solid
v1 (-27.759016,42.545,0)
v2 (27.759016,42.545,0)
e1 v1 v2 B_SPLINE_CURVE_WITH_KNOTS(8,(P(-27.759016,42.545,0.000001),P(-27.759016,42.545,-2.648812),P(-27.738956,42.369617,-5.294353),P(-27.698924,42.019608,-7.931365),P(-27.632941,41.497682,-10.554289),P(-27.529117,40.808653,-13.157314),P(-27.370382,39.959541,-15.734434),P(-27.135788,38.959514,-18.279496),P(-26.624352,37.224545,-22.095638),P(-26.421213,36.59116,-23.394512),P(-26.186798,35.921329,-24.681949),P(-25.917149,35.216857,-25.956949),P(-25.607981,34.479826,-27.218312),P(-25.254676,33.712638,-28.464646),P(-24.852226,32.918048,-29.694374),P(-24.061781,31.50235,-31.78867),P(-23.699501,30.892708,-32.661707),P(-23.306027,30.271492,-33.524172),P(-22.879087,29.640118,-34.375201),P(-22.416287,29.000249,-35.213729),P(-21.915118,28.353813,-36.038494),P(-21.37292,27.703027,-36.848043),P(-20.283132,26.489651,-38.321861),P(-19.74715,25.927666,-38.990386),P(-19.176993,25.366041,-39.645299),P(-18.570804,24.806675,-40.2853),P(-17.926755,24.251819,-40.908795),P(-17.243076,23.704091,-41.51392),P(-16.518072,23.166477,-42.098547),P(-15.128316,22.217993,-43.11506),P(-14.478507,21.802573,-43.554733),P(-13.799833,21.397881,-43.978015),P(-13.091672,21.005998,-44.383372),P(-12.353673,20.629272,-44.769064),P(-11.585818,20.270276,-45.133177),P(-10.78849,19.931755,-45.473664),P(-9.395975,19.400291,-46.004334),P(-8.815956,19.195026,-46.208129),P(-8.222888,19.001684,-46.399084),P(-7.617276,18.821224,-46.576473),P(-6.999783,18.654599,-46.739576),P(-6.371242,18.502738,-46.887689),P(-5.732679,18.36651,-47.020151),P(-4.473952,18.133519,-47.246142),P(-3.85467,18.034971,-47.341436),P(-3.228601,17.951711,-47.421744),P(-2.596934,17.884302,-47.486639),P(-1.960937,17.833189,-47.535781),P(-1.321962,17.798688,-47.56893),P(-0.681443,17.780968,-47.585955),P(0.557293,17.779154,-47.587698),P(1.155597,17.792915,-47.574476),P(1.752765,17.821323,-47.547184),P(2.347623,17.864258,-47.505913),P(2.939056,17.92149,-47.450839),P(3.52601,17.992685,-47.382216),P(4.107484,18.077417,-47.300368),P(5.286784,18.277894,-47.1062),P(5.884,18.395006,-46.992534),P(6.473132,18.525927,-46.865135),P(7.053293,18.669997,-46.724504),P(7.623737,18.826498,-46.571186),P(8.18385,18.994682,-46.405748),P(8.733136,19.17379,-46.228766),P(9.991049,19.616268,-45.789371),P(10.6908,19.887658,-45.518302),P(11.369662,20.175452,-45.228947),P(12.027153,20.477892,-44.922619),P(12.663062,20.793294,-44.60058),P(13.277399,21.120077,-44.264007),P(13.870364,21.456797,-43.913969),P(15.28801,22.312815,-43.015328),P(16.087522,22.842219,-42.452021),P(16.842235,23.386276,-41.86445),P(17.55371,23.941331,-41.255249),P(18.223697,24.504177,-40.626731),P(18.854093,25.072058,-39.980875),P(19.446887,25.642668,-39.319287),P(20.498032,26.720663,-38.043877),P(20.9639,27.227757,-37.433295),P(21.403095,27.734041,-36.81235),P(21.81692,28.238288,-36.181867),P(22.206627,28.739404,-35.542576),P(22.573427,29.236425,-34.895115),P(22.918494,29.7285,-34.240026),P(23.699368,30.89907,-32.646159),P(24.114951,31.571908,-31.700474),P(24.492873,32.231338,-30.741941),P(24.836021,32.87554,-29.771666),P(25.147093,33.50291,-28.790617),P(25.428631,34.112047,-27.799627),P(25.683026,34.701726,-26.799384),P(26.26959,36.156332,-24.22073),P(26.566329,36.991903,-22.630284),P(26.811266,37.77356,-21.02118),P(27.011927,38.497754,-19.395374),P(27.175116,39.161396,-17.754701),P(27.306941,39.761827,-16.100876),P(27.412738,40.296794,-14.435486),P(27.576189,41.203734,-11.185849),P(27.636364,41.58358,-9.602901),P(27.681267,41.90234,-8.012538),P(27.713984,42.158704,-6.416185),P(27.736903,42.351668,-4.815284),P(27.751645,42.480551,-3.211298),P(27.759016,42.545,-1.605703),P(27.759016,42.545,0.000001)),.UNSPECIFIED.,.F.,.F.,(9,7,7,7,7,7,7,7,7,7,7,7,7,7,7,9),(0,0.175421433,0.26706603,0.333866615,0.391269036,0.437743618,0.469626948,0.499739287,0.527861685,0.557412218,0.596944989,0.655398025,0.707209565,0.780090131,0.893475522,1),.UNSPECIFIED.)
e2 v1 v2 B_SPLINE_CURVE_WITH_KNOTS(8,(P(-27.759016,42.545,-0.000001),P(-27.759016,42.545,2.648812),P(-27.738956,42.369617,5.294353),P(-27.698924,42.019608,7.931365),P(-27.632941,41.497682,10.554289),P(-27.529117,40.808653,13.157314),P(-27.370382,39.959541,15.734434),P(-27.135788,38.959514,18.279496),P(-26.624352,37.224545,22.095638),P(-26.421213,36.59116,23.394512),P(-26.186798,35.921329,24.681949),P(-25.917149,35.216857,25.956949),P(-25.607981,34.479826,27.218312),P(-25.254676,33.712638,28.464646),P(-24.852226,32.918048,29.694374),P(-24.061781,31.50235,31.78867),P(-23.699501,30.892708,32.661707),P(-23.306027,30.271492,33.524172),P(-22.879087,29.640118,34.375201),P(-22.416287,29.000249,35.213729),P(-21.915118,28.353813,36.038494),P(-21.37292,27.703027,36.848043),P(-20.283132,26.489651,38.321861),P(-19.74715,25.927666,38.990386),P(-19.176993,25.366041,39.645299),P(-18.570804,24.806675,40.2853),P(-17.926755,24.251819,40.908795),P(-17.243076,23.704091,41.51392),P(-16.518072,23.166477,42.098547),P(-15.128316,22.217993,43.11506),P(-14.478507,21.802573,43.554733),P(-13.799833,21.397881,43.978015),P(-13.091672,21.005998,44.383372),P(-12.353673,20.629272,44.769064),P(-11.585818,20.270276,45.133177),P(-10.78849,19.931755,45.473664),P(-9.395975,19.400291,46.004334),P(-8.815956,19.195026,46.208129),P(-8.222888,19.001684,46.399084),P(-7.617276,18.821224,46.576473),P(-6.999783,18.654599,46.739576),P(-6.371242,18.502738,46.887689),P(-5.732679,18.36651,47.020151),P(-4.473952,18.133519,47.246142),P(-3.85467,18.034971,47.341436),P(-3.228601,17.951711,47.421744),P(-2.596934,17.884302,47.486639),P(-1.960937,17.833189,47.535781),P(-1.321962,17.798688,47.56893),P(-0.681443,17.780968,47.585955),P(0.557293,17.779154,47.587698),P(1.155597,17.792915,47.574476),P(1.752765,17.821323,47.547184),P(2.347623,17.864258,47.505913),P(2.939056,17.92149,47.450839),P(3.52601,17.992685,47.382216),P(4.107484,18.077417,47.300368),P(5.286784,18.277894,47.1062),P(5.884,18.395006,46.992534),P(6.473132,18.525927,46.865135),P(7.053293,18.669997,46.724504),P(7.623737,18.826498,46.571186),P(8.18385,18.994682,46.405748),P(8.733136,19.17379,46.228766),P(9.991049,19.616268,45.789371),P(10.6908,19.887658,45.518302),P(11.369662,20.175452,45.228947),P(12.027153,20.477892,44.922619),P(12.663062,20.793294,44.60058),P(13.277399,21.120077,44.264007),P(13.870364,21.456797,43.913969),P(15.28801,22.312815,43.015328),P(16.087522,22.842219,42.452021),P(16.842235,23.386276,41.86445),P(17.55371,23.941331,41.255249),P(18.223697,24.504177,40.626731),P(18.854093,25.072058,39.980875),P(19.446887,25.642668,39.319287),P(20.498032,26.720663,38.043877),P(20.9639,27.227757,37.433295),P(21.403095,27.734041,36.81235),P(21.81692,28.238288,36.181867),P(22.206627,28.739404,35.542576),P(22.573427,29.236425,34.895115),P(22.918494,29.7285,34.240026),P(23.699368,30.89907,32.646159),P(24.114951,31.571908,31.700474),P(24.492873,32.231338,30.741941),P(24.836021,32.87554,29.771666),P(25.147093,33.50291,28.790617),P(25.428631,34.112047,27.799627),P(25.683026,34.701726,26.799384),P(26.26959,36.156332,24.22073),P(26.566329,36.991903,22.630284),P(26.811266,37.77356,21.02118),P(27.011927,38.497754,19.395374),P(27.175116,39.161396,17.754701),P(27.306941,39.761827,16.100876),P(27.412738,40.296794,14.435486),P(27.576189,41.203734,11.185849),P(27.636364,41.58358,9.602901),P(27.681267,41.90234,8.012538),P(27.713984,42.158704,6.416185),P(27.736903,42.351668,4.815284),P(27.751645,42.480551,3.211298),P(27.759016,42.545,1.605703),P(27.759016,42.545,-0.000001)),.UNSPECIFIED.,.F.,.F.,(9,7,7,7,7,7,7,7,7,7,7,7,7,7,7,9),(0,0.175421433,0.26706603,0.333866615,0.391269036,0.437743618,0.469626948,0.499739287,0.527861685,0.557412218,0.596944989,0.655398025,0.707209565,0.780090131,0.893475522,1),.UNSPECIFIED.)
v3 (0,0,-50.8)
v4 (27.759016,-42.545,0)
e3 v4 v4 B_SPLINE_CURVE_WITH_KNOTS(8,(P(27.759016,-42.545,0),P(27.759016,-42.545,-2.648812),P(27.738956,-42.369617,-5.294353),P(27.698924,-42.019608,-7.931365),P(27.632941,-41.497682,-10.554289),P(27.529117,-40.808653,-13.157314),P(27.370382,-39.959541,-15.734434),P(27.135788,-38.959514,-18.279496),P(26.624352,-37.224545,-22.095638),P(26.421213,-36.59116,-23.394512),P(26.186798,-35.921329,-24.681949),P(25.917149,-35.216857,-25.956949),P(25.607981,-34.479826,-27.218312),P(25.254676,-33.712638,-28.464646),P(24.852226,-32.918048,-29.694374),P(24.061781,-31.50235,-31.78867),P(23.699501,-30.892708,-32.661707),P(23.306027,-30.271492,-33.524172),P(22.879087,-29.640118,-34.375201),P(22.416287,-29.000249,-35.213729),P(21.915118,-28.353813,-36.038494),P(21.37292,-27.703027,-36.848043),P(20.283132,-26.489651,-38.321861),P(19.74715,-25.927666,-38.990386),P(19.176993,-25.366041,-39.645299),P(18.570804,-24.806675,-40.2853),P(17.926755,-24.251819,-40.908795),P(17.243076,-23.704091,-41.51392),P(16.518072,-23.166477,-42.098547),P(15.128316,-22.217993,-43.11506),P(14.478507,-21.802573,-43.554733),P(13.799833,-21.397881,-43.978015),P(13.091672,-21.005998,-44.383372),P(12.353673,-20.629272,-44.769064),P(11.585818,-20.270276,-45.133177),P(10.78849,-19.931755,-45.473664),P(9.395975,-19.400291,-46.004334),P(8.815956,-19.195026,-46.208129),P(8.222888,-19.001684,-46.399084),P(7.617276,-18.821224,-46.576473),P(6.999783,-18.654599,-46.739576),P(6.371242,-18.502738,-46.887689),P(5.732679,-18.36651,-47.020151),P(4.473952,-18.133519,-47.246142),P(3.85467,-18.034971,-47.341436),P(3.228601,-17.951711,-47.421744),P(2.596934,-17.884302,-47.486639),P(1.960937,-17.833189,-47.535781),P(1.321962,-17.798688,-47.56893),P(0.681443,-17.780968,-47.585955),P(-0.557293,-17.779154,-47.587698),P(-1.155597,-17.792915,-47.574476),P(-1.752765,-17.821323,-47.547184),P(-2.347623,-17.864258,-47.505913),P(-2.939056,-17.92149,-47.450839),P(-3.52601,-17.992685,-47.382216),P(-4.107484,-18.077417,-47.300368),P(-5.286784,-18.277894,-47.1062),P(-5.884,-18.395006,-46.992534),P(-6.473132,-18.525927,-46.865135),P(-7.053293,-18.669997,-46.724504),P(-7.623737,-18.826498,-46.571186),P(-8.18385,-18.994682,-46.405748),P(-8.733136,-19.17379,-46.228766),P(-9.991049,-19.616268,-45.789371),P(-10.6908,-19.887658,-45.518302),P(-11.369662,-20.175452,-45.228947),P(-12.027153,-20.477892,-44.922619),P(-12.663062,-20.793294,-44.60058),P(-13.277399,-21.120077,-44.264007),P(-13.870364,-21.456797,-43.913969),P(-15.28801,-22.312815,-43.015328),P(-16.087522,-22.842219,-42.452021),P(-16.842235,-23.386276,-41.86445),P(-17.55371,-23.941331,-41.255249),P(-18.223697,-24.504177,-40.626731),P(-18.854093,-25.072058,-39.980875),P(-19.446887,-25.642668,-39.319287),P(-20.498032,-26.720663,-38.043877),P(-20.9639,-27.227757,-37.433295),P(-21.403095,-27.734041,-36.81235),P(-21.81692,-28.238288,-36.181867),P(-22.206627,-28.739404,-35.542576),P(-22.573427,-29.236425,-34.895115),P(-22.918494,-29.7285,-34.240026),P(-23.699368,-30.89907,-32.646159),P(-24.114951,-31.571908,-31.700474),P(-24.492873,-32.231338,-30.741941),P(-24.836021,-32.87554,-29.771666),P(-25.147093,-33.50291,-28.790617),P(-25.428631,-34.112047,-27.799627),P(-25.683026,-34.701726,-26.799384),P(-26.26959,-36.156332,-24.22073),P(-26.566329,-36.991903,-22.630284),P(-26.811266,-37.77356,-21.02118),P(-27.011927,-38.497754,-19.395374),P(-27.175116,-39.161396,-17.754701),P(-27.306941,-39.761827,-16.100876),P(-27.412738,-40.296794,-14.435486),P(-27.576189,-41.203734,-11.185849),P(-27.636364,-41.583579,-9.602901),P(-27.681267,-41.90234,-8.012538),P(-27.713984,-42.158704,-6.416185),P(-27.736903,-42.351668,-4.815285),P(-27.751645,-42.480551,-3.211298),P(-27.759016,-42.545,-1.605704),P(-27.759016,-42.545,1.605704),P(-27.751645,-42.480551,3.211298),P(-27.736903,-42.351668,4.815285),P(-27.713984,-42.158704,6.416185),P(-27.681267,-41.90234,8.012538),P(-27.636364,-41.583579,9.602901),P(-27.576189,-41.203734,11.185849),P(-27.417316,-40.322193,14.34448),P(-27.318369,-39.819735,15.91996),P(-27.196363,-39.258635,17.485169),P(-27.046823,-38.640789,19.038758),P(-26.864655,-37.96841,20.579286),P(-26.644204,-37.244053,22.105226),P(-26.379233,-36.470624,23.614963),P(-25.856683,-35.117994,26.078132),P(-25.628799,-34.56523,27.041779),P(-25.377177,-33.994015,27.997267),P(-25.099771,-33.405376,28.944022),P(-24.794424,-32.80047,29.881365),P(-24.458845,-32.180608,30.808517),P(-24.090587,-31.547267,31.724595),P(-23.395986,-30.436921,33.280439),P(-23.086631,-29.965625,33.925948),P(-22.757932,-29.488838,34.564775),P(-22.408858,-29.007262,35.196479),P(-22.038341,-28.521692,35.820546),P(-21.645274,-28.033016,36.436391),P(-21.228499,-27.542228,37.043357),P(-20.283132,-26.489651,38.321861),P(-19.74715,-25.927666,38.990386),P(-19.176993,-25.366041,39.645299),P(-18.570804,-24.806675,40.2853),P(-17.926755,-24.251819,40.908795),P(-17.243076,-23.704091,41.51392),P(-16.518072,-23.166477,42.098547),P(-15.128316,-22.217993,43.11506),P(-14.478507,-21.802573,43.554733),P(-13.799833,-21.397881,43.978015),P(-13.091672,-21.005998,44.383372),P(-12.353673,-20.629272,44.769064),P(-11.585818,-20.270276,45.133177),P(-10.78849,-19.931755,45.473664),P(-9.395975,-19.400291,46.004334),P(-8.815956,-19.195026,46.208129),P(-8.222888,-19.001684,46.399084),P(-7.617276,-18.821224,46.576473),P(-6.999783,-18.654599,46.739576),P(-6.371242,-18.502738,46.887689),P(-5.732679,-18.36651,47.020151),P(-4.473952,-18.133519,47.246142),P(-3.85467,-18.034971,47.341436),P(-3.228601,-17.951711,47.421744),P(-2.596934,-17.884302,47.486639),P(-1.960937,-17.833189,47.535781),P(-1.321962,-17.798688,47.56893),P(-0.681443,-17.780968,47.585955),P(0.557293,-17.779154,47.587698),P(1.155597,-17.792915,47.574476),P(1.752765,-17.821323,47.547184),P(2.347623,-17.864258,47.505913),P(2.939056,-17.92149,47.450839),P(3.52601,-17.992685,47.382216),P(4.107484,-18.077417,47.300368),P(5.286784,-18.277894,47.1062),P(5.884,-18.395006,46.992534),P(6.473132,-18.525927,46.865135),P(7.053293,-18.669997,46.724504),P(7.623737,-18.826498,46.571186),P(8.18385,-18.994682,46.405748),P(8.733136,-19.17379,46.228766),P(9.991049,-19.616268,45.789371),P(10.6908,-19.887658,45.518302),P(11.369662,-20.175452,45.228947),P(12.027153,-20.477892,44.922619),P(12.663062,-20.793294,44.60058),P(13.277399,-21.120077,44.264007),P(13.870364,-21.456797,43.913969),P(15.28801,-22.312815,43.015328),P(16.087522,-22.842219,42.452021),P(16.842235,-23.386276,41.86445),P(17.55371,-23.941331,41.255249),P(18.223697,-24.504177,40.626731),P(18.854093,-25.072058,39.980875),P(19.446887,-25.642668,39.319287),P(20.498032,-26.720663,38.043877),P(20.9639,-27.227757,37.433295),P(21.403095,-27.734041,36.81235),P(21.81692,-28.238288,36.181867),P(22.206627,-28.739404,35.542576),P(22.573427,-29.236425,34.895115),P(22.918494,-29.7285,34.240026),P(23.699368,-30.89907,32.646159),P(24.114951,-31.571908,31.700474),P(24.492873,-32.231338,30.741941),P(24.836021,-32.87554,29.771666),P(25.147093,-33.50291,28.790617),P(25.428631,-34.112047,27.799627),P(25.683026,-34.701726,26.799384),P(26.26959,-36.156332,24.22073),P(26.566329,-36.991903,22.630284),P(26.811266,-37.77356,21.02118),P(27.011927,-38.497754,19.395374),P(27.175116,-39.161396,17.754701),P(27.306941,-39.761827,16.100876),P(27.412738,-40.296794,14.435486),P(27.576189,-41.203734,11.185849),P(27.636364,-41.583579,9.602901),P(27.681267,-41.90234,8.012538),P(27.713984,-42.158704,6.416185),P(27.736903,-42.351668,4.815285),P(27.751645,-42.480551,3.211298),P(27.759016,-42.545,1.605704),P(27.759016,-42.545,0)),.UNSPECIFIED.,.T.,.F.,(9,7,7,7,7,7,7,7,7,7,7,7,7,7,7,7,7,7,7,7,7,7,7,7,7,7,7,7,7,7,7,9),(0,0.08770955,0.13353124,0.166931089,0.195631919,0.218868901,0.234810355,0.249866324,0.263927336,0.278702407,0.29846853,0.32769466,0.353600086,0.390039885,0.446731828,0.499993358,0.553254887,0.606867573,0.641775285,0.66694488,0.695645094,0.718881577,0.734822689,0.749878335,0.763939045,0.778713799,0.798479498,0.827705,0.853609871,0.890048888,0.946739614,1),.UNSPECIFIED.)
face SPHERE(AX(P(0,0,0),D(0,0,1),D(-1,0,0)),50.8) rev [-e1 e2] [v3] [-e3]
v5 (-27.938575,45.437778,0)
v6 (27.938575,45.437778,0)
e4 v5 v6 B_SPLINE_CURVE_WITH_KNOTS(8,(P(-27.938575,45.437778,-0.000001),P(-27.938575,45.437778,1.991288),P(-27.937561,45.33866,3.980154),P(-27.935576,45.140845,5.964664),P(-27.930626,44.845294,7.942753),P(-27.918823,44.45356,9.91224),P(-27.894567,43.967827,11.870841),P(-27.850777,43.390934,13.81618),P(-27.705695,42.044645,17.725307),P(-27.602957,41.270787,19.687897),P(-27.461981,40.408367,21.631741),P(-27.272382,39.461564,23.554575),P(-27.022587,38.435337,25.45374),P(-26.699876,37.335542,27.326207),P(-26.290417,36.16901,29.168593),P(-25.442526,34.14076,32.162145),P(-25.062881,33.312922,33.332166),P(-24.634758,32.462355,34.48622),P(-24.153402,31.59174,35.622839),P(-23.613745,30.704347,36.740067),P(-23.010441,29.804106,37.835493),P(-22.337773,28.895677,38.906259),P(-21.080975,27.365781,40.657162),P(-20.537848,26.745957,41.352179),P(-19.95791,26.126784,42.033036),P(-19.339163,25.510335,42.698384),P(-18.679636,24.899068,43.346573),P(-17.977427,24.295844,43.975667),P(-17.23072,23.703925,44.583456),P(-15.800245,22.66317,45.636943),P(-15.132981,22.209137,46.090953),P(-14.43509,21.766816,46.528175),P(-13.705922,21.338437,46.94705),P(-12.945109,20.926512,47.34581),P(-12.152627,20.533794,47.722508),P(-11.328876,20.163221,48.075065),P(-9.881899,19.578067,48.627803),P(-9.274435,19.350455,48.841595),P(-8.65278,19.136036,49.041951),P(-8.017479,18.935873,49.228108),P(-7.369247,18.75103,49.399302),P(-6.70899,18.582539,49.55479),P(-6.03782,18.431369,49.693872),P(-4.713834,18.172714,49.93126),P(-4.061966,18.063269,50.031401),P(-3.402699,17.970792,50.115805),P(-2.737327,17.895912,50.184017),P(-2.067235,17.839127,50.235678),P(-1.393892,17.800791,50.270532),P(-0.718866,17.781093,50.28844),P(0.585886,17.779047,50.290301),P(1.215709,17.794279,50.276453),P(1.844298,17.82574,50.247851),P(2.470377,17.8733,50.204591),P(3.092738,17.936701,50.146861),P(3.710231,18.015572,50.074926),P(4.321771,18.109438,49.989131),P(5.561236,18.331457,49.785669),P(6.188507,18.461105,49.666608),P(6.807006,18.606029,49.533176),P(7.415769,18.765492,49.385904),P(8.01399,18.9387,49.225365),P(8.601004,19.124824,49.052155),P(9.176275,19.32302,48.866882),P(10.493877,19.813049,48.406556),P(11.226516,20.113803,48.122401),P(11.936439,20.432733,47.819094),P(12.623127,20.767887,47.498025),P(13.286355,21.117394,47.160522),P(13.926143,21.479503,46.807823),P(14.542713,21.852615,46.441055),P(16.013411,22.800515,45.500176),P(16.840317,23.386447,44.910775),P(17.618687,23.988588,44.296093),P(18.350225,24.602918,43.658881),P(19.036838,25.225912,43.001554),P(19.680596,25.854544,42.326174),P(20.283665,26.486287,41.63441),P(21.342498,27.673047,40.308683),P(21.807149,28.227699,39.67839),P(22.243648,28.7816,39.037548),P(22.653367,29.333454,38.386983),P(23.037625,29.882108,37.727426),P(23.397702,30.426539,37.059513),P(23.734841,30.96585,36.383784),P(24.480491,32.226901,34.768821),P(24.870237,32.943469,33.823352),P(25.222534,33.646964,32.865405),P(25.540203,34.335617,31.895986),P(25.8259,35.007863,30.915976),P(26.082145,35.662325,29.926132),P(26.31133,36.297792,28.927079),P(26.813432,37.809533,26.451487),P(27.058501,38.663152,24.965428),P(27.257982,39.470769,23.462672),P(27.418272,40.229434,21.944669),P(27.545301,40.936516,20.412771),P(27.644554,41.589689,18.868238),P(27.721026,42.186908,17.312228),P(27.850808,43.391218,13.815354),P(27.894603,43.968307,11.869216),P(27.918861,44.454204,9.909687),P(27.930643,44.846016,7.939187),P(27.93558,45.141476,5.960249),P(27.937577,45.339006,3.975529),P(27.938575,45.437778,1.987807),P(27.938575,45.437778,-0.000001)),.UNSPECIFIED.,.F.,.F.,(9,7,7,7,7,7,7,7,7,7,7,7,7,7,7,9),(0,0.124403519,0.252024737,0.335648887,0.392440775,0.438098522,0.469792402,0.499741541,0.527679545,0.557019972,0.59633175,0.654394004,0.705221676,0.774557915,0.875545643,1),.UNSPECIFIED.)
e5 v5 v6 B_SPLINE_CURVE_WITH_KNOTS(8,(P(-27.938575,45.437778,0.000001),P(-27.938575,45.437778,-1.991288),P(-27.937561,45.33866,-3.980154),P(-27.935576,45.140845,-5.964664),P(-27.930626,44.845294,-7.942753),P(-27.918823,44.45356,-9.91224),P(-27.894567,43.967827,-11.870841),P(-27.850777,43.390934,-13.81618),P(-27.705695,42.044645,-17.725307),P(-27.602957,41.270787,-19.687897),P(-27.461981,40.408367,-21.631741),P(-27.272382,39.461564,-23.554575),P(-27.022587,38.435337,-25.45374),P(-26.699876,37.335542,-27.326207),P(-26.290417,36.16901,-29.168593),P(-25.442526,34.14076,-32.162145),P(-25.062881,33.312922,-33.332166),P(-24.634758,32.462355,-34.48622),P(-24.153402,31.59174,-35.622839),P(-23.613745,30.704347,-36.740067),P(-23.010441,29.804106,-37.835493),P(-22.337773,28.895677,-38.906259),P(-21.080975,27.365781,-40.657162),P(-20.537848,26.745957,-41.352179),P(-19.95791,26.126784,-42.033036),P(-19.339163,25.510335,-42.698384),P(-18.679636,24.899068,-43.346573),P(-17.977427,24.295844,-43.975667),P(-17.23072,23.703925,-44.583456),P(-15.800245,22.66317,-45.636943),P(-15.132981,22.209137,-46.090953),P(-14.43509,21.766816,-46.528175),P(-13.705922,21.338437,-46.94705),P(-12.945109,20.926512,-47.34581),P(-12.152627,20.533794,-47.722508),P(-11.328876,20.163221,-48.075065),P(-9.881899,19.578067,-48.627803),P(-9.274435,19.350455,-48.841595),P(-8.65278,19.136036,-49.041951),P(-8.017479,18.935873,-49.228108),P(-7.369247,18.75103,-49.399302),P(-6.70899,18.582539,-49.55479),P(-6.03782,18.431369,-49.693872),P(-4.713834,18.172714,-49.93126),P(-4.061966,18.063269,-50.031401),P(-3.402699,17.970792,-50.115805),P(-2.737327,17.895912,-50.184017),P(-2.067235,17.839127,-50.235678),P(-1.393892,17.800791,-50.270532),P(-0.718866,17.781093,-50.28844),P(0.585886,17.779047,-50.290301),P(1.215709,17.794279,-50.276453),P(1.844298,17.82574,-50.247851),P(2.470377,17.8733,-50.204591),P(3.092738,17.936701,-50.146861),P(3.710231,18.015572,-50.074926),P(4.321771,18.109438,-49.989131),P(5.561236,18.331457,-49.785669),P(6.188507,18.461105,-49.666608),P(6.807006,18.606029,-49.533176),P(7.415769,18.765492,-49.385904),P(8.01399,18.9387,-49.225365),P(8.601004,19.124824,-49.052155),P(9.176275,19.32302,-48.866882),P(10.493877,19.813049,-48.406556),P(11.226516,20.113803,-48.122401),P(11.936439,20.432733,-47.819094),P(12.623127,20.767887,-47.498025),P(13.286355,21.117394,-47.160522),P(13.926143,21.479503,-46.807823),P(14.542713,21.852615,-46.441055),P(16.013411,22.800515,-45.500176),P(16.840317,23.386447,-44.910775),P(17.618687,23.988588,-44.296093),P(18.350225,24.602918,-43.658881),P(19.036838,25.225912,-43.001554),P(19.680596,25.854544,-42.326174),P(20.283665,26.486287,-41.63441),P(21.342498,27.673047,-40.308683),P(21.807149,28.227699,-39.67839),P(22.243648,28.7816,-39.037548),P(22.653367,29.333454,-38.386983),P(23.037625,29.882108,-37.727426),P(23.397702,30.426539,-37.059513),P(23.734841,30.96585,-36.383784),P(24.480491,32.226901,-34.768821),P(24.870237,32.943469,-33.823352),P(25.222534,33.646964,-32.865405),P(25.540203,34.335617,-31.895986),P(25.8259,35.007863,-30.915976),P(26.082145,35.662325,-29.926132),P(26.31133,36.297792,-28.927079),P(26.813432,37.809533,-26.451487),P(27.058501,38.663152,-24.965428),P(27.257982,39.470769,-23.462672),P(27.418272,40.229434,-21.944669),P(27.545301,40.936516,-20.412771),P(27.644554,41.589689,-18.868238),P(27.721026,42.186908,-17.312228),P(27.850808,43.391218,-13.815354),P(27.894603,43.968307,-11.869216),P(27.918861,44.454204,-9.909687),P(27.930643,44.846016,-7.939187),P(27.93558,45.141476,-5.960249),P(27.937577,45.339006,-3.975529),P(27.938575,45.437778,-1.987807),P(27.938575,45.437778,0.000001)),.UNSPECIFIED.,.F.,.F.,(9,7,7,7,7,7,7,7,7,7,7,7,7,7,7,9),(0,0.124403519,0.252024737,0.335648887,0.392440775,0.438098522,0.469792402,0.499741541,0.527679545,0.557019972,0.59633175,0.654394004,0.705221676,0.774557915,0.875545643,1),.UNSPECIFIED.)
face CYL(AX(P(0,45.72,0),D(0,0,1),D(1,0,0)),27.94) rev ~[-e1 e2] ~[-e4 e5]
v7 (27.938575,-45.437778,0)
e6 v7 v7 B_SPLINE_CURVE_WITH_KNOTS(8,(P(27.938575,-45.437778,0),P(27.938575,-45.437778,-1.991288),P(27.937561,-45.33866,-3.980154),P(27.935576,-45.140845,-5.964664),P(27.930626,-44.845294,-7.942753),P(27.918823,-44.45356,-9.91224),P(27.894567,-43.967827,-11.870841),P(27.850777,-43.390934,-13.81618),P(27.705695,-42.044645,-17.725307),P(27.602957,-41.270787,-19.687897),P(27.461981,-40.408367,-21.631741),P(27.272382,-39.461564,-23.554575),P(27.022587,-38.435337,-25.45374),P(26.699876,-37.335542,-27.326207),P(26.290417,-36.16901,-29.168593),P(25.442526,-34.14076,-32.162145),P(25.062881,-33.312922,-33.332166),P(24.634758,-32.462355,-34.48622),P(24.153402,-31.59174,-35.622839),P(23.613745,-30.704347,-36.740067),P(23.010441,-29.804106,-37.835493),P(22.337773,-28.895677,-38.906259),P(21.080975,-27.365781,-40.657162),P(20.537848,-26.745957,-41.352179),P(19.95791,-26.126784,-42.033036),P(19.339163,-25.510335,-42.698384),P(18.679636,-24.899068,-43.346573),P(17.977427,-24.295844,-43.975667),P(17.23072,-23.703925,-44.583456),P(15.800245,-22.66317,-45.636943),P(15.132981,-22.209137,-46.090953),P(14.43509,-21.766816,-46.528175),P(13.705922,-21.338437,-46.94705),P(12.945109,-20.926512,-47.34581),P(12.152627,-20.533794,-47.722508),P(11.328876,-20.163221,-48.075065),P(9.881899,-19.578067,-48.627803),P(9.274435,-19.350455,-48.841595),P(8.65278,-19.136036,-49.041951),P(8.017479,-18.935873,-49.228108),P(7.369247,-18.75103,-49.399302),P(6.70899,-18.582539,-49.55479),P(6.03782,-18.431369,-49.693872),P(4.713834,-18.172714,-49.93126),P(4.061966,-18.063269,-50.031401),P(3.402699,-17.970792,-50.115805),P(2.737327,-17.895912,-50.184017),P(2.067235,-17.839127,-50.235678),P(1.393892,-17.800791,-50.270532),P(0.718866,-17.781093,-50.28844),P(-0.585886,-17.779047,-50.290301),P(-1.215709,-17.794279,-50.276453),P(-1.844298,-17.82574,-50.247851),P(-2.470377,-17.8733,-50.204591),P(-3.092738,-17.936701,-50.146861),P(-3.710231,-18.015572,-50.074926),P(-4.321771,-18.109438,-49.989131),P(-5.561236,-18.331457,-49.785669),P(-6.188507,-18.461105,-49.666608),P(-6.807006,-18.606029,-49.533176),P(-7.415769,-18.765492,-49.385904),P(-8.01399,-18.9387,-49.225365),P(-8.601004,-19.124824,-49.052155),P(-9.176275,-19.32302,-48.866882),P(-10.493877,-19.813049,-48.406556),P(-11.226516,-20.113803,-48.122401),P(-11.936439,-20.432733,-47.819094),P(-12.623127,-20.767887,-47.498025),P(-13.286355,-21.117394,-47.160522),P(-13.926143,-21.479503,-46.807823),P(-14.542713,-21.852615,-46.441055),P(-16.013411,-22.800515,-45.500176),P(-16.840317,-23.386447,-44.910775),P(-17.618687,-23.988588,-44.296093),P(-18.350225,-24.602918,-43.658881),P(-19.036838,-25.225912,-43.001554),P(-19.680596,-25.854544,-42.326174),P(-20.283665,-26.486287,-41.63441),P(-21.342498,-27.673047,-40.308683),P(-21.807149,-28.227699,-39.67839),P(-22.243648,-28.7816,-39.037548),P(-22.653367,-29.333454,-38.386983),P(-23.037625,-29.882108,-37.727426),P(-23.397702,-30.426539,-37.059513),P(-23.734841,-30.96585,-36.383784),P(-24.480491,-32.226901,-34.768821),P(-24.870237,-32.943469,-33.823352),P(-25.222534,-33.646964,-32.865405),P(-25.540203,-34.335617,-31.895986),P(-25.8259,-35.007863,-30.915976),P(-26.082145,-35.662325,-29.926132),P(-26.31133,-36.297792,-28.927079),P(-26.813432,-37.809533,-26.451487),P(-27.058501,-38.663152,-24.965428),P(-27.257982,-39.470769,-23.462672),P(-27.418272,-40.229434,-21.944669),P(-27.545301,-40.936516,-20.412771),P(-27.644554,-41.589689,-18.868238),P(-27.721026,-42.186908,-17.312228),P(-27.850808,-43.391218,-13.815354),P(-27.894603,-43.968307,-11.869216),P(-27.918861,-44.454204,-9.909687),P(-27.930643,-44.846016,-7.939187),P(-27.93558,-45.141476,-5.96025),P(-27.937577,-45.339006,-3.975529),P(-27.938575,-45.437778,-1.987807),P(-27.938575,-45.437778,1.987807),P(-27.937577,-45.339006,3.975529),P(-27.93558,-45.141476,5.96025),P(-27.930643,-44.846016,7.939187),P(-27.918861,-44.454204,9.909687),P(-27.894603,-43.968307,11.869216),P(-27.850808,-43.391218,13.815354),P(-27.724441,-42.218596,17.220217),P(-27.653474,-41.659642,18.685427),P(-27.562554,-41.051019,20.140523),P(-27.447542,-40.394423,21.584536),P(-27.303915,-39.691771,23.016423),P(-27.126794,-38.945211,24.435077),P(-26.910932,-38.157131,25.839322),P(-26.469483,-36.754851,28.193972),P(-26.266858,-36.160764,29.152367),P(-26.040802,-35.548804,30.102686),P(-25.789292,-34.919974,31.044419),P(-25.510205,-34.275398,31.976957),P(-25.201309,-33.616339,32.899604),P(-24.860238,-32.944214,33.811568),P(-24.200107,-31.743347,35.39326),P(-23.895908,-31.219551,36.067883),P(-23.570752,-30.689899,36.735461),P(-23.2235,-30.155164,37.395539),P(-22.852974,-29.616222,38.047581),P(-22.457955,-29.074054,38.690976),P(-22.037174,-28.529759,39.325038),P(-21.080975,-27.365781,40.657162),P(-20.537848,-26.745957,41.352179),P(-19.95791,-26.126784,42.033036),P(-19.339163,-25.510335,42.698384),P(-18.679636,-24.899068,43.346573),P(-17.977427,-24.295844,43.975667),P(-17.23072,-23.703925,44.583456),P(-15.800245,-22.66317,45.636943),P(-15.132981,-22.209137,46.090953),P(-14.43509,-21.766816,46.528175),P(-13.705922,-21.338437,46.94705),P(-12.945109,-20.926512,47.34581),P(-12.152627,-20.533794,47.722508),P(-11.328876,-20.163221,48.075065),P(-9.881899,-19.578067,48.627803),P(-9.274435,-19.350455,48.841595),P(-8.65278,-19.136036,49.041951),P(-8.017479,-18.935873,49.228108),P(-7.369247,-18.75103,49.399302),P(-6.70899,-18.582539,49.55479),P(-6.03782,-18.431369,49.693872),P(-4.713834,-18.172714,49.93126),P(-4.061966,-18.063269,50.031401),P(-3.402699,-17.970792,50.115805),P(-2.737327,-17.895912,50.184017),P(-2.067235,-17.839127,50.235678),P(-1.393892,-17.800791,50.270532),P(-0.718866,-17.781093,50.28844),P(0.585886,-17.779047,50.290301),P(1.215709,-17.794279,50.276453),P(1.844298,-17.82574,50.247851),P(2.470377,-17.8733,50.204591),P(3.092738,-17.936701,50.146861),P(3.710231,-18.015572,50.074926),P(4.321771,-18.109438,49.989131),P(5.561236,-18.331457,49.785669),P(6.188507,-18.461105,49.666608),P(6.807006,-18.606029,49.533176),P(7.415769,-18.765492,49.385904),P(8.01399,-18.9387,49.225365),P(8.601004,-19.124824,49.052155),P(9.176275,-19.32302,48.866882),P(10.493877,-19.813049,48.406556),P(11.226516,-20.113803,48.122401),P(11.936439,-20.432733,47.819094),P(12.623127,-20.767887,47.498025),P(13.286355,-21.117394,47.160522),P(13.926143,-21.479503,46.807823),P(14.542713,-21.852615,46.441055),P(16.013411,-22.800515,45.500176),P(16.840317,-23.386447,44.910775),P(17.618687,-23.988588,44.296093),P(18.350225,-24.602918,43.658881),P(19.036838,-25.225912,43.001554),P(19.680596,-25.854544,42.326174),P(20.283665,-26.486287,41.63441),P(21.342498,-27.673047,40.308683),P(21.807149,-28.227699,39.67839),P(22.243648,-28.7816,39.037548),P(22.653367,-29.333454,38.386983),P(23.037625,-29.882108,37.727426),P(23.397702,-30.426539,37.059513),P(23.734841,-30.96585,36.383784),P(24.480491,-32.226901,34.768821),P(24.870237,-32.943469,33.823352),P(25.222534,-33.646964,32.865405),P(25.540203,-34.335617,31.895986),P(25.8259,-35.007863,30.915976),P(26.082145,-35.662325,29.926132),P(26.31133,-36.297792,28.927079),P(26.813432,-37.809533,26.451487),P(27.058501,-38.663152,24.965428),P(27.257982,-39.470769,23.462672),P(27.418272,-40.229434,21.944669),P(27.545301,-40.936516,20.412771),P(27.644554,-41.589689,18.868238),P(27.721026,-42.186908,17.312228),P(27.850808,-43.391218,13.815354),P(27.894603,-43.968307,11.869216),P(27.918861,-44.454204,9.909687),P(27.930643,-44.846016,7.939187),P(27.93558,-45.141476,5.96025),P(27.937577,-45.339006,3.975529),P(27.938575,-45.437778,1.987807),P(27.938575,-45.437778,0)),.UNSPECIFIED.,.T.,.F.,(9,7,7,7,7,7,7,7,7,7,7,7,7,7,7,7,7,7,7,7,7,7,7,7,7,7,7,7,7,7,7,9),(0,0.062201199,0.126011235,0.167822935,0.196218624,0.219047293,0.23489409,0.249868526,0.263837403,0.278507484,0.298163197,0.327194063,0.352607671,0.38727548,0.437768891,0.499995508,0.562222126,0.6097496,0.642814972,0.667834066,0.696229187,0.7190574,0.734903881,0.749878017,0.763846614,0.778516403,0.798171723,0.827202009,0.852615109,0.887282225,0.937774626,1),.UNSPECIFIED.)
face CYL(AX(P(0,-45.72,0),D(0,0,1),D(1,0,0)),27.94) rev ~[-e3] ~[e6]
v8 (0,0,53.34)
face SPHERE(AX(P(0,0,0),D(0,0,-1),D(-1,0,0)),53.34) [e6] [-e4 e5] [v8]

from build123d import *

# Parameters (mm, degrees)
F2_R     = 27.94
F3_DEPTH = 63.5


# Not quite as in the source:
# - the program builds the solid bodies; features that only make, move or delete a surface that nothing else refers to are left out


with BuildPart() as f1:
    # F0 (on Front) → F1 (revolve)
    with BuildSketch(Plane.XZ):
        with BuildLine():
            ThreePointArc((0, -50.8), (-50.8, 0), (0, 50.8))
            Line((0, 50.8), (0, 53.34))
            ThreePointArc((0, 53.34), (-53.34, 0), (0, -53.34))
            Line((0, -53.34), (0, -50.8))
        make_face()
    revolve(axis=Axis((0, 0, -2.3532360792), (0, 0, -1)))

    # F2 (on Top) → F3 (cut, symmetric)
    with BuildSketch(Plane.XY):
        with Locations((0, 45.72)):
            Circle(F2_R)
        with Locations((0, -45.72)):
            Circle(F2_R)
    extrude(amount=F3_DEPTH, both=True, mode=Mode.SUBTRACT)


solid = f1.part
